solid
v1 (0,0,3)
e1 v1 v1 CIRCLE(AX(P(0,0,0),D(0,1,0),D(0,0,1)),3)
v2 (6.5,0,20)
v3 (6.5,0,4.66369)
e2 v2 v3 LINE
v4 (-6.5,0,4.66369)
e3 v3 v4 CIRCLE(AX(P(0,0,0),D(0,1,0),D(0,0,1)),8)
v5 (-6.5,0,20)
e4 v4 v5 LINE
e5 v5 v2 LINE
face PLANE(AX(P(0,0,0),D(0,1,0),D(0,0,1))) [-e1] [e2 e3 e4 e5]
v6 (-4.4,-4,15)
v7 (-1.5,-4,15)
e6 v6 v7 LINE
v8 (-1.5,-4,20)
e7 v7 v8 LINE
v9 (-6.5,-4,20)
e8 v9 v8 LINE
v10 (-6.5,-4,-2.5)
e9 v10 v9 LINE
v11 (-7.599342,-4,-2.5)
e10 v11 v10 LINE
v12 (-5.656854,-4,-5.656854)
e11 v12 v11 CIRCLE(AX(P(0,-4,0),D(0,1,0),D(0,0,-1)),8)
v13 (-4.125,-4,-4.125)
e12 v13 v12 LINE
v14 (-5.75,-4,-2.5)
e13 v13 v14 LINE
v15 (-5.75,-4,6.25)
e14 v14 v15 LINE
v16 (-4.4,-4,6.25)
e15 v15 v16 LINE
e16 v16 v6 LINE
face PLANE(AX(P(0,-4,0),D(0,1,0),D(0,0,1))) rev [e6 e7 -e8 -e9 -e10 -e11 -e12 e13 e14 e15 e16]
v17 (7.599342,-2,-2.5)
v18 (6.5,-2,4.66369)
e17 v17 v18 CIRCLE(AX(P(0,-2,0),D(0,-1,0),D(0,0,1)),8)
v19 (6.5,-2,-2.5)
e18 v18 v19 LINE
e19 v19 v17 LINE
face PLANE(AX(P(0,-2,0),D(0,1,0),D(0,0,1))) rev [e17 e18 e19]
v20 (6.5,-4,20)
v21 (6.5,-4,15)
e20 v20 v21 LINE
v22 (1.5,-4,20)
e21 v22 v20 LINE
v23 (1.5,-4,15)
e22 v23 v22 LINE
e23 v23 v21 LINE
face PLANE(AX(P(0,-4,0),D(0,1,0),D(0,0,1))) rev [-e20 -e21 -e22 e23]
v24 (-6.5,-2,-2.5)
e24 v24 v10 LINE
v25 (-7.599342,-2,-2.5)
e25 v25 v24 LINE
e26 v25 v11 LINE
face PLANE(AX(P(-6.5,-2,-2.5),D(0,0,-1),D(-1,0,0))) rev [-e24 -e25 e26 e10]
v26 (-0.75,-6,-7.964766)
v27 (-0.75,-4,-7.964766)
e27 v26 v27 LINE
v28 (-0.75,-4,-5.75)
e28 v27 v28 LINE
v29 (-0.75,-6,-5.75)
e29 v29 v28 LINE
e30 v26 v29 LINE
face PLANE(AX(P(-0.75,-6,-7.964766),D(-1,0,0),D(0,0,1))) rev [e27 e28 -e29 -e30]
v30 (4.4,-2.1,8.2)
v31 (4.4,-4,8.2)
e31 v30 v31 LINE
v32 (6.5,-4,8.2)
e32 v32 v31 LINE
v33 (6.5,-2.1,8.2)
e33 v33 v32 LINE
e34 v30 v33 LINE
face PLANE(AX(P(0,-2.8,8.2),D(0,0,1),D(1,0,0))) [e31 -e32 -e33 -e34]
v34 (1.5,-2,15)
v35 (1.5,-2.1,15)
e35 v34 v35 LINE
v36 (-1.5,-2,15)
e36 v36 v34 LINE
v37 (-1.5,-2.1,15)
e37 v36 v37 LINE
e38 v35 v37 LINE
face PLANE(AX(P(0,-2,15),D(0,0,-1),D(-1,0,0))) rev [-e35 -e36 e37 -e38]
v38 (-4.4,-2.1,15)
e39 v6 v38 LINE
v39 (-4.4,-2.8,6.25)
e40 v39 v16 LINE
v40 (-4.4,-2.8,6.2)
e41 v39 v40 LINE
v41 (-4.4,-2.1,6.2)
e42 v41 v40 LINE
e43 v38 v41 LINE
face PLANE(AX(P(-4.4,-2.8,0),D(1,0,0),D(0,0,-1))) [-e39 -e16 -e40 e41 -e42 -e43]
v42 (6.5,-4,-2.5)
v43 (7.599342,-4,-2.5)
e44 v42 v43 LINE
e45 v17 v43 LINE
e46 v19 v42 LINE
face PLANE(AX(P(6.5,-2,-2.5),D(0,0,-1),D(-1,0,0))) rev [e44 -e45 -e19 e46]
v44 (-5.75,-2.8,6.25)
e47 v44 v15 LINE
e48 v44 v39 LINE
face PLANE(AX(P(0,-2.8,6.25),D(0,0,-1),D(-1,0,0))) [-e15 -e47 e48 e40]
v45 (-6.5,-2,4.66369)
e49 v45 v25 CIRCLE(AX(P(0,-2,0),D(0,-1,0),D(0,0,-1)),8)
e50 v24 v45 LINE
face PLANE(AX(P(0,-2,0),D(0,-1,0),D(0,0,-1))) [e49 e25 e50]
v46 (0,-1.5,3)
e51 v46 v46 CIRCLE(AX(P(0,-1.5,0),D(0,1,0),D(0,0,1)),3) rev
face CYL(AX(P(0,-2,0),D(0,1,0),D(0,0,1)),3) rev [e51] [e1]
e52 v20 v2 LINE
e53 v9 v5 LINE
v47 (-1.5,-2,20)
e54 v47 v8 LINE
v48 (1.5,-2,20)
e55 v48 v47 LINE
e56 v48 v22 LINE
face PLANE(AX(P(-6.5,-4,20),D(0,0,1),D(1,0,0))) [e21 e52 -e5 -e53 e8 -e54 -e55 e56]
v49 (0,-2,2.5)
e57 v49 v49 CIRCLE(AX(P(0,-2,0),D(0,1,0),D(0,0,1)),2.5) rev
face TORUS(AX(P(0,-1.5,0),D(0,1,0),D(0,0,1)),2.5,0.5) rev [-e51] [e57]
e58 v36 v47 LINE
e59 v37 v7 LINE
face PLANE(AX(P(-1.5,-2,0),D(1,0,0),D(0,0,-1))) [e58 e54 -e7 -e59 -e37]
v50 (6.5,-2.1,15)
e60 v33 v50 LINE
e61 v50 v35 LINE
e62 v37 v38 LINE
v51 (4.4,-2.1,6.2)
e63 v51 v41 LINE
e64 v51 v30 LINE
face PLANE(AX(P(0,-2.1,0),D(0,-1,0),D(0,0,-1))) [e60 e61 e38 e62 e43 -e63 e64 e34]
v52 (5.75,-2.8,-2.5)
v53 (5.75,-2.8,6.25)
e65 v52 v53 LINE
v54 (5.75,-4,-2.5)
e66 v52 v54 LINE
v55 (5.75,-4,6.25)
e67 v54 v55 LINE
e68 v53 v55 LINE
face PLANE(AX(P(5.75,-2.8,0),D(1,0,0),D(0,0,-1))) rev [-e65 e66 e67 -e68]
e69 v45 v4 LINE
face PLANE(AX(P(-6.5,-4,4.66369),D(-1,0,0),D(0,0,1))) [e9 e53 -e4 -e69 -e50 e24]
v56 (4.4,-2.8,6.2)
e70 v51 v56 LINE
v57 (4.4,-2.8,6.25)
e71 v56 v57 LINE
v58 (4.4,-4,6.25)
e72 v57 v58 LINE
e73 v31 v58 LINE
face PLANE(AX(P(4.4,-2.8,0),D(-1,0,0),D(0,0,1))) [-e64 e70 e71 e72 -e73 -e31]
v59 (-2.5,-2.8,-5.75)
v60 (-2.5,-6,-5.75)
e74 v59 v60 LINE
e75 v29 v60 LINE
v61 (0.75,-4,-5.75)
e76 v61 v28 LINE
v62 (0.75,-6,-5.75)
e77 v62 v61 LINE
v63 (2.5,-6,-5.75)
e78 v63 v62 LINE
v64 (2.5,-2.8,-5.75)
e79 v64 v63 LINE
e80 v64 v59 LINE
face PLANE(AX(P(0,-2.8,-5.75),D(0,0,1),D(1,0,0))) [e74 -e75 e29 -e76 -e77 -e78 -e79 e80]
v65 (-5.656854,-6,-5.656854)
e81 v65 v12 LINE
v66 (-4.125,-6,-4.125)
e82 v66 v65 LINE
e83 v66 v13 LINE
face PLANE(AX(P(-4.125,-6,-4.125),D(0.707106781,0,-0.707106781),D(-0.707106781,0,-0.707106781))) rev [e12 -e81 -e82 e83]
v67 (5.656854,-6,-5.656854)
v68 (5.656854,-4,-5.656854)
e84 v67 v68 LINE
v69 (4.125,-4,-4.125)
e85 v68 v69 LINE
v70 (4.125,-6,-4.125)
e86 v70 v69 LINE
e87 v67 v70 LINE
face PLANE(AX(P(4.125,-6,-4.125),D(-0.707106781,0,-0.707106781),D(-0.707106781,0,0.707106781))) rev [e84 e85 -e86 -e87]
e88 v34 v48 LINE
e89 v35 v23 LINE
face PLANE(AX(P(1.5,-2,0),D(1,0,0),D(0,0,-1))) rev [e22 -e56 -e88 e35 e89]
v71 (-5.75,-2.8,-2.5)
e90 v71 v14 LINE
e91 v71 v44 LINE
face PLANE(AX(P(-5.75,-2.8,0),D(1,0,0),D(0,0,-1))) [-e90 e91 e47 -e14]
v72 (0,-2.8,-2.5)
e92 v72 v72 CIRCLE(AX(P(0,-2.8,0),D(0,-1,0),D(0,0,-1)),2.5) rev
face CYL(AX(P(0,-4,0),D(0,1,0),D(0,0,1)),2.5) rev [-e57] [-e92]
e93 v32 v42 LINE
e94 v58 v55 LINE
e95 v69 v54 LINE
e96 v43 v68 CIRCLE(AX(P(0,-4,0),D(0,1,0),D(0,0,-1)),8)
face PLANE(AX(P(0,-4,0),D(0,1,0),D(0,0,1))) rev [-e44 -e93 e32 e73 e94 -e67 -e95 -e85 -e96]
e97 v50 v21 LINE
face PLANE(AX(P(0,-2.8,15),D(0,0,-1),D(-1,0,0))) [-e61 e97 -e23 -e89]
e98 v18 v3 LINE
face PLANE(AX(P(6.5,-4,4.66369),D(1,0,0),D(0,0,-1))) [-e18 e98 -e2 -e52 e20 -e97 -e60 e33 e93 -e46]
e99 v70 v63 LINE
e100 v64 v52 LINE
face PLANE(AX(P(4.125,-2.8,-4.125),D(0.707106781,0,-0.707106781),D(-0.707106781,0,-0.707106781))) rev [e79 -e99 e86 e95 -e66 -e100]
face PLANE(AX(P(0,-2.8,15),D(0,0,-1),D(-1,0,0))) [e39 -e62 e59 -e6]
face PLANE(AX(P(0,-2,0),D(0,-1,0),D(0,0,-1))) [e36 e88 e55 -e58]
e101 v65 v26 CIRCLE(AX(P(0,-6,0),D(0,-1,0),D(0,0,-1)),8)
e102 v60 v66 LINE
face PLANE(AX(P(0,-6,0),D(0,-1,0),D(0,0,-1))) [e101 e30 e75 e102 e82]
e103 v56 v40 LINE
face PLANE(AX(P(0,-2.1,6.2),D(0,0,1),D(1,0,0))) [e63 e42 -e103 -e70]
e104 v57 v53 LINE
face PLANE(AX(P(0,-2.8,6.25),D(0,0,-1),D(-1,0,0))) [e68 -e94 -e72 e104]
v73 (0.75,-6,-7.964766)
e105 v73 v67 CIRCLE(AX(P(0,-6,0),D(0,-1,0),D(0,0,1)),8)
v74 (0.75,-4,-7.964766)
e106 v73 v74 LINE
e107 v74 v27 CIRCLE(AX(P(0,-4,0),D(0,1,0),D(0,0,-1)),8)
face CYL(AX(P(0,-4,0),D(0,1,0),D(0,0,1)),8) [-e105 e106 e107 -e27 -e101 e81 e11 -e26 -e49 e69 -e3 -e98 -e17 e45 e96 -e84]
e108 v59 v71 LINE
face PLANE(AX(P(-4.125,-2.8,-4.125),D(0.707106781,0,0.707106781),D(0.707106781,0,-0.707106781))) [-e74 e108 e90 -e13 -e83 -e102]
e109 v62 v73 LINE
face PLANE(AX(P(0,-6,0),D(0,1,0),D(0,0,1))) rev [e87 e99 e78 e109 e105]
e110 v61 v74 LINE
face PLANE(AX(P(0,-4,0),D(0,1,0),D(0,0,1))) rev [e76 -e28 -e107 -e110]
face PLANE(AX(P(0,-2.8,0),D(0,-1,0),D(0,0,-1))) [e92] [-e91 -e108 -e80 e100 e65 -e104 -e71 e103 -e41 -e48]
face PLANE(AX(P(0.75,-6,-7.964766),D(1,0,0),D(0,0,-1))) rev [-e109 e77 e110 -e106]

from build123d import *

# Parameters (mm, degrees)
BOSS_EXTRUDE1_DEPTH = 4
SKETCH2_R           = 2.5
CUT_EXTRUDE1_DEPTH  = 22.9089023
SKETCH3_R           = 3
CUT_EXTRUDE2_DEPTH  = 2
CUT_EXTRUDE3_DEPTH  = 1.2
CUT_EXTRUDE5_DEPTH  = 0.7
CUT_EXTRUDE8_START  = -2
CUT_EXTRUDE8_DEPTH  = 2
BOSS_EXTRUDE3_DEPTH = 2
FILLET3_R           = 0.5
CUT_EXTRUDE9_DEPTH  = 2
BOSS_EXTRUDE4_DEPTH = 1.9


with BuildPart() as part:
    # Sketch1 → Boss-Extrude1 (new body)
    with BuildSketch(Plane(origin=(0, 0, 0), x_dir=(1, 0, 0), z_dir=(0, 1, 0))):
        with BuildLine():
            Line((-6.5, -20), (6.5, -20))
            Line((6.5, -20), (6.5, -4.663689527))
            ThreePointArc((6.5, -4.663689527), (8, 0), (6.5, 4.663689527))
            ThreePointArc((6.5, 4.663689527), (0, 8), (-6.5, 4.663689527))
            ThreePointArc((-6.5, 4.663689527), (-8, 0), (-6.5, -4.663689527))
            Line((-6.5, -4.663689527), (-6.5, -20))
        make_face()
    extrude(amount=-BOSS_EXTRUDE1_DEPTH)

    # Sketch2 → Cut-Extrude1 (cut, through all)
    with BuildSketch(Plane(origin=(0, 0, 0), x_dir=(1, 0, 0), z_dir=(0, 1, 0))):
        with Locations(Location((0, 0, 0), (0, 0, 270))):
            Circle(SKETCH2_R)
    extrude(amount=-CUT_EXTRUDE1_DEPTH, mode=Mode.SUBTRACT)

    # Sketch3 → Cut-Extrude2 (cut)
    with BuildSketch(Plane(origin=(0, 0, 0), x_dir=(1, 0, 0), z_dir=(0, 1, 0))):
        with Locations(Location((0, 0, 0), (0, 0, 270))):
            Circle(SKETCH3_R)
    extrude(amount=-CUT_EXTRUDE2_DEPTH, mode=Mode.SUBTRACT)

    # Sketch4 → Cut-Extrude3 (cut)
    with BuildSketch(Plane.XZ.offset(4)):
        Polygon((2.5, -5.75), (-2.5, -5.75), (-5.75, -2.5), (-5.75, 6.25), (-4.4, 6.25), (-4.4, 8.2), (-5.660373569, 10), (-6.5, 10), (-6.5, 11.199110814), (-6.5, 15), (6.5, 15), (6.5, 11.199110814), (6.5, 10), (6.5, 8.2), (4.4, 8.2), (4.4, 6.25), (5.75, 6.25), (5.75, -2.5), align=None)
    extrude(amount=-CUT_EXTRUDE3_DEPTH, mode=Mode.SUBTRACT)

    # Sketch6 → Cut-Extrude5 (cut)
    with BuildSketch(Plane.XZ.offset(2.8)):
        Polygon((6.5, 8.2), (6.5, 15), (-6.5, 15), (-6.5, 11.199110814), (-5.660373569, 10), (-4.4, 8.2), (-4.4, 6.2), (4.4, 6.2), (4.4, 8.2), align=None)
    extrude(amount=-CUT_EXTRUDE5_DEPTH, mode=Mode.SUBTRACT)

    # Sketch10 → Cut-Extrude8 (cut)
    with BuildSketch(Plane.XZ.offset(4).offset(CUT_EXTRUDE8_START)):
        with BuildLine():
            Line((-6.5, 4.663689527), (-6.5, -2.5))
            Line((-6.5, -2.5), (-7.599342077, -2.5))
            ThreePointArc((-7.599342077, -2.5), (-7.907431546, 1.213476964), (-6.5, 4.663689527))
        make_face()
        with BuildLine():
            Line((6.5, 4.663689527), (6.5, -2.5))
            Line((6.5, -2.5), (7.599342077, -2.5))
            ThreePointArc((7.599342077, -2.5), (7.907431546, 1.213476964), (6.5, 4.663689527))
        make_face()
    extrude(amount=CUT_EXTRUDE8_DEPTH, mode=Mode.SUBTRACT)

    # Sketch11 → Boss-Extrude3 (add)
    with BuildSketch(Plane.XZ.offset(4)):
        with BuildLine():
            Line((-0.75, -7.964766161), (-0.75, -5.75))
            Line((-0.75, -5.75), (-2.5, -5.75))
            Line((-2.5, -5.75), (-4.125, -4.125))
            Line((-4.125, -4.125), (-5.656854249, -5.656854249))
            ThreePointArc((-5.656854249, -5.656854249), (-3.404931672, -7.239229262), (-0.75, -7.964766161))
        make_face()
        with BuildLine():
            Line((0.75, -7.964766161), (0.75, -5.75))
            Line((0.75, -5.75), (2.5, -5.75))
            Line((2.5, -5.75), (4.125, -4.125))
            Line((4.125, -4.125), (5.656854249, -5.656854249))
            ThreePointArc((5.656854249, -5.656854249), (3.404931672, -7.239229262), (0.75, -7.964766161))
        make_face()
    extrude(amount=BOSS_EXTRUDE3_DEPTH)

    # Fillet3
    fillet3_edges = [part.edges().sort_by_distance(p)[0] for p in [
        (0, -2, -3),
    ]]
    fillet(fillet3_edges, radius=FILLET3_R - 0.0001)  # a hair under: the kernel refuses the full size

    # Sketch12 → Cut-Extrude9 (cut)
    with BuildSketch(Plane.XZ.offset(4)):
        Polygon((0, 15), (1.5, 15), (1.5, 20), (-1.5, 20), (-1.5, 15), align=None)
    extrude(amount=-CUT_EXTRUDE9_DEPTH, mode=Mode.SUBTRACT)

    # Sketch13 → Boss-Extrude4 (add)
    with BuildSketch(Plane.XZ.offset(2.1)):
        Polygon((-6.5, 15), (-6.5, 10), (-5.660373569, 10), (-4.4, 8.2), (-4.4, 15), align=None)
    extrude(amount=BOSS_EXTRUDE4_DEPTH)


solid = part.part
